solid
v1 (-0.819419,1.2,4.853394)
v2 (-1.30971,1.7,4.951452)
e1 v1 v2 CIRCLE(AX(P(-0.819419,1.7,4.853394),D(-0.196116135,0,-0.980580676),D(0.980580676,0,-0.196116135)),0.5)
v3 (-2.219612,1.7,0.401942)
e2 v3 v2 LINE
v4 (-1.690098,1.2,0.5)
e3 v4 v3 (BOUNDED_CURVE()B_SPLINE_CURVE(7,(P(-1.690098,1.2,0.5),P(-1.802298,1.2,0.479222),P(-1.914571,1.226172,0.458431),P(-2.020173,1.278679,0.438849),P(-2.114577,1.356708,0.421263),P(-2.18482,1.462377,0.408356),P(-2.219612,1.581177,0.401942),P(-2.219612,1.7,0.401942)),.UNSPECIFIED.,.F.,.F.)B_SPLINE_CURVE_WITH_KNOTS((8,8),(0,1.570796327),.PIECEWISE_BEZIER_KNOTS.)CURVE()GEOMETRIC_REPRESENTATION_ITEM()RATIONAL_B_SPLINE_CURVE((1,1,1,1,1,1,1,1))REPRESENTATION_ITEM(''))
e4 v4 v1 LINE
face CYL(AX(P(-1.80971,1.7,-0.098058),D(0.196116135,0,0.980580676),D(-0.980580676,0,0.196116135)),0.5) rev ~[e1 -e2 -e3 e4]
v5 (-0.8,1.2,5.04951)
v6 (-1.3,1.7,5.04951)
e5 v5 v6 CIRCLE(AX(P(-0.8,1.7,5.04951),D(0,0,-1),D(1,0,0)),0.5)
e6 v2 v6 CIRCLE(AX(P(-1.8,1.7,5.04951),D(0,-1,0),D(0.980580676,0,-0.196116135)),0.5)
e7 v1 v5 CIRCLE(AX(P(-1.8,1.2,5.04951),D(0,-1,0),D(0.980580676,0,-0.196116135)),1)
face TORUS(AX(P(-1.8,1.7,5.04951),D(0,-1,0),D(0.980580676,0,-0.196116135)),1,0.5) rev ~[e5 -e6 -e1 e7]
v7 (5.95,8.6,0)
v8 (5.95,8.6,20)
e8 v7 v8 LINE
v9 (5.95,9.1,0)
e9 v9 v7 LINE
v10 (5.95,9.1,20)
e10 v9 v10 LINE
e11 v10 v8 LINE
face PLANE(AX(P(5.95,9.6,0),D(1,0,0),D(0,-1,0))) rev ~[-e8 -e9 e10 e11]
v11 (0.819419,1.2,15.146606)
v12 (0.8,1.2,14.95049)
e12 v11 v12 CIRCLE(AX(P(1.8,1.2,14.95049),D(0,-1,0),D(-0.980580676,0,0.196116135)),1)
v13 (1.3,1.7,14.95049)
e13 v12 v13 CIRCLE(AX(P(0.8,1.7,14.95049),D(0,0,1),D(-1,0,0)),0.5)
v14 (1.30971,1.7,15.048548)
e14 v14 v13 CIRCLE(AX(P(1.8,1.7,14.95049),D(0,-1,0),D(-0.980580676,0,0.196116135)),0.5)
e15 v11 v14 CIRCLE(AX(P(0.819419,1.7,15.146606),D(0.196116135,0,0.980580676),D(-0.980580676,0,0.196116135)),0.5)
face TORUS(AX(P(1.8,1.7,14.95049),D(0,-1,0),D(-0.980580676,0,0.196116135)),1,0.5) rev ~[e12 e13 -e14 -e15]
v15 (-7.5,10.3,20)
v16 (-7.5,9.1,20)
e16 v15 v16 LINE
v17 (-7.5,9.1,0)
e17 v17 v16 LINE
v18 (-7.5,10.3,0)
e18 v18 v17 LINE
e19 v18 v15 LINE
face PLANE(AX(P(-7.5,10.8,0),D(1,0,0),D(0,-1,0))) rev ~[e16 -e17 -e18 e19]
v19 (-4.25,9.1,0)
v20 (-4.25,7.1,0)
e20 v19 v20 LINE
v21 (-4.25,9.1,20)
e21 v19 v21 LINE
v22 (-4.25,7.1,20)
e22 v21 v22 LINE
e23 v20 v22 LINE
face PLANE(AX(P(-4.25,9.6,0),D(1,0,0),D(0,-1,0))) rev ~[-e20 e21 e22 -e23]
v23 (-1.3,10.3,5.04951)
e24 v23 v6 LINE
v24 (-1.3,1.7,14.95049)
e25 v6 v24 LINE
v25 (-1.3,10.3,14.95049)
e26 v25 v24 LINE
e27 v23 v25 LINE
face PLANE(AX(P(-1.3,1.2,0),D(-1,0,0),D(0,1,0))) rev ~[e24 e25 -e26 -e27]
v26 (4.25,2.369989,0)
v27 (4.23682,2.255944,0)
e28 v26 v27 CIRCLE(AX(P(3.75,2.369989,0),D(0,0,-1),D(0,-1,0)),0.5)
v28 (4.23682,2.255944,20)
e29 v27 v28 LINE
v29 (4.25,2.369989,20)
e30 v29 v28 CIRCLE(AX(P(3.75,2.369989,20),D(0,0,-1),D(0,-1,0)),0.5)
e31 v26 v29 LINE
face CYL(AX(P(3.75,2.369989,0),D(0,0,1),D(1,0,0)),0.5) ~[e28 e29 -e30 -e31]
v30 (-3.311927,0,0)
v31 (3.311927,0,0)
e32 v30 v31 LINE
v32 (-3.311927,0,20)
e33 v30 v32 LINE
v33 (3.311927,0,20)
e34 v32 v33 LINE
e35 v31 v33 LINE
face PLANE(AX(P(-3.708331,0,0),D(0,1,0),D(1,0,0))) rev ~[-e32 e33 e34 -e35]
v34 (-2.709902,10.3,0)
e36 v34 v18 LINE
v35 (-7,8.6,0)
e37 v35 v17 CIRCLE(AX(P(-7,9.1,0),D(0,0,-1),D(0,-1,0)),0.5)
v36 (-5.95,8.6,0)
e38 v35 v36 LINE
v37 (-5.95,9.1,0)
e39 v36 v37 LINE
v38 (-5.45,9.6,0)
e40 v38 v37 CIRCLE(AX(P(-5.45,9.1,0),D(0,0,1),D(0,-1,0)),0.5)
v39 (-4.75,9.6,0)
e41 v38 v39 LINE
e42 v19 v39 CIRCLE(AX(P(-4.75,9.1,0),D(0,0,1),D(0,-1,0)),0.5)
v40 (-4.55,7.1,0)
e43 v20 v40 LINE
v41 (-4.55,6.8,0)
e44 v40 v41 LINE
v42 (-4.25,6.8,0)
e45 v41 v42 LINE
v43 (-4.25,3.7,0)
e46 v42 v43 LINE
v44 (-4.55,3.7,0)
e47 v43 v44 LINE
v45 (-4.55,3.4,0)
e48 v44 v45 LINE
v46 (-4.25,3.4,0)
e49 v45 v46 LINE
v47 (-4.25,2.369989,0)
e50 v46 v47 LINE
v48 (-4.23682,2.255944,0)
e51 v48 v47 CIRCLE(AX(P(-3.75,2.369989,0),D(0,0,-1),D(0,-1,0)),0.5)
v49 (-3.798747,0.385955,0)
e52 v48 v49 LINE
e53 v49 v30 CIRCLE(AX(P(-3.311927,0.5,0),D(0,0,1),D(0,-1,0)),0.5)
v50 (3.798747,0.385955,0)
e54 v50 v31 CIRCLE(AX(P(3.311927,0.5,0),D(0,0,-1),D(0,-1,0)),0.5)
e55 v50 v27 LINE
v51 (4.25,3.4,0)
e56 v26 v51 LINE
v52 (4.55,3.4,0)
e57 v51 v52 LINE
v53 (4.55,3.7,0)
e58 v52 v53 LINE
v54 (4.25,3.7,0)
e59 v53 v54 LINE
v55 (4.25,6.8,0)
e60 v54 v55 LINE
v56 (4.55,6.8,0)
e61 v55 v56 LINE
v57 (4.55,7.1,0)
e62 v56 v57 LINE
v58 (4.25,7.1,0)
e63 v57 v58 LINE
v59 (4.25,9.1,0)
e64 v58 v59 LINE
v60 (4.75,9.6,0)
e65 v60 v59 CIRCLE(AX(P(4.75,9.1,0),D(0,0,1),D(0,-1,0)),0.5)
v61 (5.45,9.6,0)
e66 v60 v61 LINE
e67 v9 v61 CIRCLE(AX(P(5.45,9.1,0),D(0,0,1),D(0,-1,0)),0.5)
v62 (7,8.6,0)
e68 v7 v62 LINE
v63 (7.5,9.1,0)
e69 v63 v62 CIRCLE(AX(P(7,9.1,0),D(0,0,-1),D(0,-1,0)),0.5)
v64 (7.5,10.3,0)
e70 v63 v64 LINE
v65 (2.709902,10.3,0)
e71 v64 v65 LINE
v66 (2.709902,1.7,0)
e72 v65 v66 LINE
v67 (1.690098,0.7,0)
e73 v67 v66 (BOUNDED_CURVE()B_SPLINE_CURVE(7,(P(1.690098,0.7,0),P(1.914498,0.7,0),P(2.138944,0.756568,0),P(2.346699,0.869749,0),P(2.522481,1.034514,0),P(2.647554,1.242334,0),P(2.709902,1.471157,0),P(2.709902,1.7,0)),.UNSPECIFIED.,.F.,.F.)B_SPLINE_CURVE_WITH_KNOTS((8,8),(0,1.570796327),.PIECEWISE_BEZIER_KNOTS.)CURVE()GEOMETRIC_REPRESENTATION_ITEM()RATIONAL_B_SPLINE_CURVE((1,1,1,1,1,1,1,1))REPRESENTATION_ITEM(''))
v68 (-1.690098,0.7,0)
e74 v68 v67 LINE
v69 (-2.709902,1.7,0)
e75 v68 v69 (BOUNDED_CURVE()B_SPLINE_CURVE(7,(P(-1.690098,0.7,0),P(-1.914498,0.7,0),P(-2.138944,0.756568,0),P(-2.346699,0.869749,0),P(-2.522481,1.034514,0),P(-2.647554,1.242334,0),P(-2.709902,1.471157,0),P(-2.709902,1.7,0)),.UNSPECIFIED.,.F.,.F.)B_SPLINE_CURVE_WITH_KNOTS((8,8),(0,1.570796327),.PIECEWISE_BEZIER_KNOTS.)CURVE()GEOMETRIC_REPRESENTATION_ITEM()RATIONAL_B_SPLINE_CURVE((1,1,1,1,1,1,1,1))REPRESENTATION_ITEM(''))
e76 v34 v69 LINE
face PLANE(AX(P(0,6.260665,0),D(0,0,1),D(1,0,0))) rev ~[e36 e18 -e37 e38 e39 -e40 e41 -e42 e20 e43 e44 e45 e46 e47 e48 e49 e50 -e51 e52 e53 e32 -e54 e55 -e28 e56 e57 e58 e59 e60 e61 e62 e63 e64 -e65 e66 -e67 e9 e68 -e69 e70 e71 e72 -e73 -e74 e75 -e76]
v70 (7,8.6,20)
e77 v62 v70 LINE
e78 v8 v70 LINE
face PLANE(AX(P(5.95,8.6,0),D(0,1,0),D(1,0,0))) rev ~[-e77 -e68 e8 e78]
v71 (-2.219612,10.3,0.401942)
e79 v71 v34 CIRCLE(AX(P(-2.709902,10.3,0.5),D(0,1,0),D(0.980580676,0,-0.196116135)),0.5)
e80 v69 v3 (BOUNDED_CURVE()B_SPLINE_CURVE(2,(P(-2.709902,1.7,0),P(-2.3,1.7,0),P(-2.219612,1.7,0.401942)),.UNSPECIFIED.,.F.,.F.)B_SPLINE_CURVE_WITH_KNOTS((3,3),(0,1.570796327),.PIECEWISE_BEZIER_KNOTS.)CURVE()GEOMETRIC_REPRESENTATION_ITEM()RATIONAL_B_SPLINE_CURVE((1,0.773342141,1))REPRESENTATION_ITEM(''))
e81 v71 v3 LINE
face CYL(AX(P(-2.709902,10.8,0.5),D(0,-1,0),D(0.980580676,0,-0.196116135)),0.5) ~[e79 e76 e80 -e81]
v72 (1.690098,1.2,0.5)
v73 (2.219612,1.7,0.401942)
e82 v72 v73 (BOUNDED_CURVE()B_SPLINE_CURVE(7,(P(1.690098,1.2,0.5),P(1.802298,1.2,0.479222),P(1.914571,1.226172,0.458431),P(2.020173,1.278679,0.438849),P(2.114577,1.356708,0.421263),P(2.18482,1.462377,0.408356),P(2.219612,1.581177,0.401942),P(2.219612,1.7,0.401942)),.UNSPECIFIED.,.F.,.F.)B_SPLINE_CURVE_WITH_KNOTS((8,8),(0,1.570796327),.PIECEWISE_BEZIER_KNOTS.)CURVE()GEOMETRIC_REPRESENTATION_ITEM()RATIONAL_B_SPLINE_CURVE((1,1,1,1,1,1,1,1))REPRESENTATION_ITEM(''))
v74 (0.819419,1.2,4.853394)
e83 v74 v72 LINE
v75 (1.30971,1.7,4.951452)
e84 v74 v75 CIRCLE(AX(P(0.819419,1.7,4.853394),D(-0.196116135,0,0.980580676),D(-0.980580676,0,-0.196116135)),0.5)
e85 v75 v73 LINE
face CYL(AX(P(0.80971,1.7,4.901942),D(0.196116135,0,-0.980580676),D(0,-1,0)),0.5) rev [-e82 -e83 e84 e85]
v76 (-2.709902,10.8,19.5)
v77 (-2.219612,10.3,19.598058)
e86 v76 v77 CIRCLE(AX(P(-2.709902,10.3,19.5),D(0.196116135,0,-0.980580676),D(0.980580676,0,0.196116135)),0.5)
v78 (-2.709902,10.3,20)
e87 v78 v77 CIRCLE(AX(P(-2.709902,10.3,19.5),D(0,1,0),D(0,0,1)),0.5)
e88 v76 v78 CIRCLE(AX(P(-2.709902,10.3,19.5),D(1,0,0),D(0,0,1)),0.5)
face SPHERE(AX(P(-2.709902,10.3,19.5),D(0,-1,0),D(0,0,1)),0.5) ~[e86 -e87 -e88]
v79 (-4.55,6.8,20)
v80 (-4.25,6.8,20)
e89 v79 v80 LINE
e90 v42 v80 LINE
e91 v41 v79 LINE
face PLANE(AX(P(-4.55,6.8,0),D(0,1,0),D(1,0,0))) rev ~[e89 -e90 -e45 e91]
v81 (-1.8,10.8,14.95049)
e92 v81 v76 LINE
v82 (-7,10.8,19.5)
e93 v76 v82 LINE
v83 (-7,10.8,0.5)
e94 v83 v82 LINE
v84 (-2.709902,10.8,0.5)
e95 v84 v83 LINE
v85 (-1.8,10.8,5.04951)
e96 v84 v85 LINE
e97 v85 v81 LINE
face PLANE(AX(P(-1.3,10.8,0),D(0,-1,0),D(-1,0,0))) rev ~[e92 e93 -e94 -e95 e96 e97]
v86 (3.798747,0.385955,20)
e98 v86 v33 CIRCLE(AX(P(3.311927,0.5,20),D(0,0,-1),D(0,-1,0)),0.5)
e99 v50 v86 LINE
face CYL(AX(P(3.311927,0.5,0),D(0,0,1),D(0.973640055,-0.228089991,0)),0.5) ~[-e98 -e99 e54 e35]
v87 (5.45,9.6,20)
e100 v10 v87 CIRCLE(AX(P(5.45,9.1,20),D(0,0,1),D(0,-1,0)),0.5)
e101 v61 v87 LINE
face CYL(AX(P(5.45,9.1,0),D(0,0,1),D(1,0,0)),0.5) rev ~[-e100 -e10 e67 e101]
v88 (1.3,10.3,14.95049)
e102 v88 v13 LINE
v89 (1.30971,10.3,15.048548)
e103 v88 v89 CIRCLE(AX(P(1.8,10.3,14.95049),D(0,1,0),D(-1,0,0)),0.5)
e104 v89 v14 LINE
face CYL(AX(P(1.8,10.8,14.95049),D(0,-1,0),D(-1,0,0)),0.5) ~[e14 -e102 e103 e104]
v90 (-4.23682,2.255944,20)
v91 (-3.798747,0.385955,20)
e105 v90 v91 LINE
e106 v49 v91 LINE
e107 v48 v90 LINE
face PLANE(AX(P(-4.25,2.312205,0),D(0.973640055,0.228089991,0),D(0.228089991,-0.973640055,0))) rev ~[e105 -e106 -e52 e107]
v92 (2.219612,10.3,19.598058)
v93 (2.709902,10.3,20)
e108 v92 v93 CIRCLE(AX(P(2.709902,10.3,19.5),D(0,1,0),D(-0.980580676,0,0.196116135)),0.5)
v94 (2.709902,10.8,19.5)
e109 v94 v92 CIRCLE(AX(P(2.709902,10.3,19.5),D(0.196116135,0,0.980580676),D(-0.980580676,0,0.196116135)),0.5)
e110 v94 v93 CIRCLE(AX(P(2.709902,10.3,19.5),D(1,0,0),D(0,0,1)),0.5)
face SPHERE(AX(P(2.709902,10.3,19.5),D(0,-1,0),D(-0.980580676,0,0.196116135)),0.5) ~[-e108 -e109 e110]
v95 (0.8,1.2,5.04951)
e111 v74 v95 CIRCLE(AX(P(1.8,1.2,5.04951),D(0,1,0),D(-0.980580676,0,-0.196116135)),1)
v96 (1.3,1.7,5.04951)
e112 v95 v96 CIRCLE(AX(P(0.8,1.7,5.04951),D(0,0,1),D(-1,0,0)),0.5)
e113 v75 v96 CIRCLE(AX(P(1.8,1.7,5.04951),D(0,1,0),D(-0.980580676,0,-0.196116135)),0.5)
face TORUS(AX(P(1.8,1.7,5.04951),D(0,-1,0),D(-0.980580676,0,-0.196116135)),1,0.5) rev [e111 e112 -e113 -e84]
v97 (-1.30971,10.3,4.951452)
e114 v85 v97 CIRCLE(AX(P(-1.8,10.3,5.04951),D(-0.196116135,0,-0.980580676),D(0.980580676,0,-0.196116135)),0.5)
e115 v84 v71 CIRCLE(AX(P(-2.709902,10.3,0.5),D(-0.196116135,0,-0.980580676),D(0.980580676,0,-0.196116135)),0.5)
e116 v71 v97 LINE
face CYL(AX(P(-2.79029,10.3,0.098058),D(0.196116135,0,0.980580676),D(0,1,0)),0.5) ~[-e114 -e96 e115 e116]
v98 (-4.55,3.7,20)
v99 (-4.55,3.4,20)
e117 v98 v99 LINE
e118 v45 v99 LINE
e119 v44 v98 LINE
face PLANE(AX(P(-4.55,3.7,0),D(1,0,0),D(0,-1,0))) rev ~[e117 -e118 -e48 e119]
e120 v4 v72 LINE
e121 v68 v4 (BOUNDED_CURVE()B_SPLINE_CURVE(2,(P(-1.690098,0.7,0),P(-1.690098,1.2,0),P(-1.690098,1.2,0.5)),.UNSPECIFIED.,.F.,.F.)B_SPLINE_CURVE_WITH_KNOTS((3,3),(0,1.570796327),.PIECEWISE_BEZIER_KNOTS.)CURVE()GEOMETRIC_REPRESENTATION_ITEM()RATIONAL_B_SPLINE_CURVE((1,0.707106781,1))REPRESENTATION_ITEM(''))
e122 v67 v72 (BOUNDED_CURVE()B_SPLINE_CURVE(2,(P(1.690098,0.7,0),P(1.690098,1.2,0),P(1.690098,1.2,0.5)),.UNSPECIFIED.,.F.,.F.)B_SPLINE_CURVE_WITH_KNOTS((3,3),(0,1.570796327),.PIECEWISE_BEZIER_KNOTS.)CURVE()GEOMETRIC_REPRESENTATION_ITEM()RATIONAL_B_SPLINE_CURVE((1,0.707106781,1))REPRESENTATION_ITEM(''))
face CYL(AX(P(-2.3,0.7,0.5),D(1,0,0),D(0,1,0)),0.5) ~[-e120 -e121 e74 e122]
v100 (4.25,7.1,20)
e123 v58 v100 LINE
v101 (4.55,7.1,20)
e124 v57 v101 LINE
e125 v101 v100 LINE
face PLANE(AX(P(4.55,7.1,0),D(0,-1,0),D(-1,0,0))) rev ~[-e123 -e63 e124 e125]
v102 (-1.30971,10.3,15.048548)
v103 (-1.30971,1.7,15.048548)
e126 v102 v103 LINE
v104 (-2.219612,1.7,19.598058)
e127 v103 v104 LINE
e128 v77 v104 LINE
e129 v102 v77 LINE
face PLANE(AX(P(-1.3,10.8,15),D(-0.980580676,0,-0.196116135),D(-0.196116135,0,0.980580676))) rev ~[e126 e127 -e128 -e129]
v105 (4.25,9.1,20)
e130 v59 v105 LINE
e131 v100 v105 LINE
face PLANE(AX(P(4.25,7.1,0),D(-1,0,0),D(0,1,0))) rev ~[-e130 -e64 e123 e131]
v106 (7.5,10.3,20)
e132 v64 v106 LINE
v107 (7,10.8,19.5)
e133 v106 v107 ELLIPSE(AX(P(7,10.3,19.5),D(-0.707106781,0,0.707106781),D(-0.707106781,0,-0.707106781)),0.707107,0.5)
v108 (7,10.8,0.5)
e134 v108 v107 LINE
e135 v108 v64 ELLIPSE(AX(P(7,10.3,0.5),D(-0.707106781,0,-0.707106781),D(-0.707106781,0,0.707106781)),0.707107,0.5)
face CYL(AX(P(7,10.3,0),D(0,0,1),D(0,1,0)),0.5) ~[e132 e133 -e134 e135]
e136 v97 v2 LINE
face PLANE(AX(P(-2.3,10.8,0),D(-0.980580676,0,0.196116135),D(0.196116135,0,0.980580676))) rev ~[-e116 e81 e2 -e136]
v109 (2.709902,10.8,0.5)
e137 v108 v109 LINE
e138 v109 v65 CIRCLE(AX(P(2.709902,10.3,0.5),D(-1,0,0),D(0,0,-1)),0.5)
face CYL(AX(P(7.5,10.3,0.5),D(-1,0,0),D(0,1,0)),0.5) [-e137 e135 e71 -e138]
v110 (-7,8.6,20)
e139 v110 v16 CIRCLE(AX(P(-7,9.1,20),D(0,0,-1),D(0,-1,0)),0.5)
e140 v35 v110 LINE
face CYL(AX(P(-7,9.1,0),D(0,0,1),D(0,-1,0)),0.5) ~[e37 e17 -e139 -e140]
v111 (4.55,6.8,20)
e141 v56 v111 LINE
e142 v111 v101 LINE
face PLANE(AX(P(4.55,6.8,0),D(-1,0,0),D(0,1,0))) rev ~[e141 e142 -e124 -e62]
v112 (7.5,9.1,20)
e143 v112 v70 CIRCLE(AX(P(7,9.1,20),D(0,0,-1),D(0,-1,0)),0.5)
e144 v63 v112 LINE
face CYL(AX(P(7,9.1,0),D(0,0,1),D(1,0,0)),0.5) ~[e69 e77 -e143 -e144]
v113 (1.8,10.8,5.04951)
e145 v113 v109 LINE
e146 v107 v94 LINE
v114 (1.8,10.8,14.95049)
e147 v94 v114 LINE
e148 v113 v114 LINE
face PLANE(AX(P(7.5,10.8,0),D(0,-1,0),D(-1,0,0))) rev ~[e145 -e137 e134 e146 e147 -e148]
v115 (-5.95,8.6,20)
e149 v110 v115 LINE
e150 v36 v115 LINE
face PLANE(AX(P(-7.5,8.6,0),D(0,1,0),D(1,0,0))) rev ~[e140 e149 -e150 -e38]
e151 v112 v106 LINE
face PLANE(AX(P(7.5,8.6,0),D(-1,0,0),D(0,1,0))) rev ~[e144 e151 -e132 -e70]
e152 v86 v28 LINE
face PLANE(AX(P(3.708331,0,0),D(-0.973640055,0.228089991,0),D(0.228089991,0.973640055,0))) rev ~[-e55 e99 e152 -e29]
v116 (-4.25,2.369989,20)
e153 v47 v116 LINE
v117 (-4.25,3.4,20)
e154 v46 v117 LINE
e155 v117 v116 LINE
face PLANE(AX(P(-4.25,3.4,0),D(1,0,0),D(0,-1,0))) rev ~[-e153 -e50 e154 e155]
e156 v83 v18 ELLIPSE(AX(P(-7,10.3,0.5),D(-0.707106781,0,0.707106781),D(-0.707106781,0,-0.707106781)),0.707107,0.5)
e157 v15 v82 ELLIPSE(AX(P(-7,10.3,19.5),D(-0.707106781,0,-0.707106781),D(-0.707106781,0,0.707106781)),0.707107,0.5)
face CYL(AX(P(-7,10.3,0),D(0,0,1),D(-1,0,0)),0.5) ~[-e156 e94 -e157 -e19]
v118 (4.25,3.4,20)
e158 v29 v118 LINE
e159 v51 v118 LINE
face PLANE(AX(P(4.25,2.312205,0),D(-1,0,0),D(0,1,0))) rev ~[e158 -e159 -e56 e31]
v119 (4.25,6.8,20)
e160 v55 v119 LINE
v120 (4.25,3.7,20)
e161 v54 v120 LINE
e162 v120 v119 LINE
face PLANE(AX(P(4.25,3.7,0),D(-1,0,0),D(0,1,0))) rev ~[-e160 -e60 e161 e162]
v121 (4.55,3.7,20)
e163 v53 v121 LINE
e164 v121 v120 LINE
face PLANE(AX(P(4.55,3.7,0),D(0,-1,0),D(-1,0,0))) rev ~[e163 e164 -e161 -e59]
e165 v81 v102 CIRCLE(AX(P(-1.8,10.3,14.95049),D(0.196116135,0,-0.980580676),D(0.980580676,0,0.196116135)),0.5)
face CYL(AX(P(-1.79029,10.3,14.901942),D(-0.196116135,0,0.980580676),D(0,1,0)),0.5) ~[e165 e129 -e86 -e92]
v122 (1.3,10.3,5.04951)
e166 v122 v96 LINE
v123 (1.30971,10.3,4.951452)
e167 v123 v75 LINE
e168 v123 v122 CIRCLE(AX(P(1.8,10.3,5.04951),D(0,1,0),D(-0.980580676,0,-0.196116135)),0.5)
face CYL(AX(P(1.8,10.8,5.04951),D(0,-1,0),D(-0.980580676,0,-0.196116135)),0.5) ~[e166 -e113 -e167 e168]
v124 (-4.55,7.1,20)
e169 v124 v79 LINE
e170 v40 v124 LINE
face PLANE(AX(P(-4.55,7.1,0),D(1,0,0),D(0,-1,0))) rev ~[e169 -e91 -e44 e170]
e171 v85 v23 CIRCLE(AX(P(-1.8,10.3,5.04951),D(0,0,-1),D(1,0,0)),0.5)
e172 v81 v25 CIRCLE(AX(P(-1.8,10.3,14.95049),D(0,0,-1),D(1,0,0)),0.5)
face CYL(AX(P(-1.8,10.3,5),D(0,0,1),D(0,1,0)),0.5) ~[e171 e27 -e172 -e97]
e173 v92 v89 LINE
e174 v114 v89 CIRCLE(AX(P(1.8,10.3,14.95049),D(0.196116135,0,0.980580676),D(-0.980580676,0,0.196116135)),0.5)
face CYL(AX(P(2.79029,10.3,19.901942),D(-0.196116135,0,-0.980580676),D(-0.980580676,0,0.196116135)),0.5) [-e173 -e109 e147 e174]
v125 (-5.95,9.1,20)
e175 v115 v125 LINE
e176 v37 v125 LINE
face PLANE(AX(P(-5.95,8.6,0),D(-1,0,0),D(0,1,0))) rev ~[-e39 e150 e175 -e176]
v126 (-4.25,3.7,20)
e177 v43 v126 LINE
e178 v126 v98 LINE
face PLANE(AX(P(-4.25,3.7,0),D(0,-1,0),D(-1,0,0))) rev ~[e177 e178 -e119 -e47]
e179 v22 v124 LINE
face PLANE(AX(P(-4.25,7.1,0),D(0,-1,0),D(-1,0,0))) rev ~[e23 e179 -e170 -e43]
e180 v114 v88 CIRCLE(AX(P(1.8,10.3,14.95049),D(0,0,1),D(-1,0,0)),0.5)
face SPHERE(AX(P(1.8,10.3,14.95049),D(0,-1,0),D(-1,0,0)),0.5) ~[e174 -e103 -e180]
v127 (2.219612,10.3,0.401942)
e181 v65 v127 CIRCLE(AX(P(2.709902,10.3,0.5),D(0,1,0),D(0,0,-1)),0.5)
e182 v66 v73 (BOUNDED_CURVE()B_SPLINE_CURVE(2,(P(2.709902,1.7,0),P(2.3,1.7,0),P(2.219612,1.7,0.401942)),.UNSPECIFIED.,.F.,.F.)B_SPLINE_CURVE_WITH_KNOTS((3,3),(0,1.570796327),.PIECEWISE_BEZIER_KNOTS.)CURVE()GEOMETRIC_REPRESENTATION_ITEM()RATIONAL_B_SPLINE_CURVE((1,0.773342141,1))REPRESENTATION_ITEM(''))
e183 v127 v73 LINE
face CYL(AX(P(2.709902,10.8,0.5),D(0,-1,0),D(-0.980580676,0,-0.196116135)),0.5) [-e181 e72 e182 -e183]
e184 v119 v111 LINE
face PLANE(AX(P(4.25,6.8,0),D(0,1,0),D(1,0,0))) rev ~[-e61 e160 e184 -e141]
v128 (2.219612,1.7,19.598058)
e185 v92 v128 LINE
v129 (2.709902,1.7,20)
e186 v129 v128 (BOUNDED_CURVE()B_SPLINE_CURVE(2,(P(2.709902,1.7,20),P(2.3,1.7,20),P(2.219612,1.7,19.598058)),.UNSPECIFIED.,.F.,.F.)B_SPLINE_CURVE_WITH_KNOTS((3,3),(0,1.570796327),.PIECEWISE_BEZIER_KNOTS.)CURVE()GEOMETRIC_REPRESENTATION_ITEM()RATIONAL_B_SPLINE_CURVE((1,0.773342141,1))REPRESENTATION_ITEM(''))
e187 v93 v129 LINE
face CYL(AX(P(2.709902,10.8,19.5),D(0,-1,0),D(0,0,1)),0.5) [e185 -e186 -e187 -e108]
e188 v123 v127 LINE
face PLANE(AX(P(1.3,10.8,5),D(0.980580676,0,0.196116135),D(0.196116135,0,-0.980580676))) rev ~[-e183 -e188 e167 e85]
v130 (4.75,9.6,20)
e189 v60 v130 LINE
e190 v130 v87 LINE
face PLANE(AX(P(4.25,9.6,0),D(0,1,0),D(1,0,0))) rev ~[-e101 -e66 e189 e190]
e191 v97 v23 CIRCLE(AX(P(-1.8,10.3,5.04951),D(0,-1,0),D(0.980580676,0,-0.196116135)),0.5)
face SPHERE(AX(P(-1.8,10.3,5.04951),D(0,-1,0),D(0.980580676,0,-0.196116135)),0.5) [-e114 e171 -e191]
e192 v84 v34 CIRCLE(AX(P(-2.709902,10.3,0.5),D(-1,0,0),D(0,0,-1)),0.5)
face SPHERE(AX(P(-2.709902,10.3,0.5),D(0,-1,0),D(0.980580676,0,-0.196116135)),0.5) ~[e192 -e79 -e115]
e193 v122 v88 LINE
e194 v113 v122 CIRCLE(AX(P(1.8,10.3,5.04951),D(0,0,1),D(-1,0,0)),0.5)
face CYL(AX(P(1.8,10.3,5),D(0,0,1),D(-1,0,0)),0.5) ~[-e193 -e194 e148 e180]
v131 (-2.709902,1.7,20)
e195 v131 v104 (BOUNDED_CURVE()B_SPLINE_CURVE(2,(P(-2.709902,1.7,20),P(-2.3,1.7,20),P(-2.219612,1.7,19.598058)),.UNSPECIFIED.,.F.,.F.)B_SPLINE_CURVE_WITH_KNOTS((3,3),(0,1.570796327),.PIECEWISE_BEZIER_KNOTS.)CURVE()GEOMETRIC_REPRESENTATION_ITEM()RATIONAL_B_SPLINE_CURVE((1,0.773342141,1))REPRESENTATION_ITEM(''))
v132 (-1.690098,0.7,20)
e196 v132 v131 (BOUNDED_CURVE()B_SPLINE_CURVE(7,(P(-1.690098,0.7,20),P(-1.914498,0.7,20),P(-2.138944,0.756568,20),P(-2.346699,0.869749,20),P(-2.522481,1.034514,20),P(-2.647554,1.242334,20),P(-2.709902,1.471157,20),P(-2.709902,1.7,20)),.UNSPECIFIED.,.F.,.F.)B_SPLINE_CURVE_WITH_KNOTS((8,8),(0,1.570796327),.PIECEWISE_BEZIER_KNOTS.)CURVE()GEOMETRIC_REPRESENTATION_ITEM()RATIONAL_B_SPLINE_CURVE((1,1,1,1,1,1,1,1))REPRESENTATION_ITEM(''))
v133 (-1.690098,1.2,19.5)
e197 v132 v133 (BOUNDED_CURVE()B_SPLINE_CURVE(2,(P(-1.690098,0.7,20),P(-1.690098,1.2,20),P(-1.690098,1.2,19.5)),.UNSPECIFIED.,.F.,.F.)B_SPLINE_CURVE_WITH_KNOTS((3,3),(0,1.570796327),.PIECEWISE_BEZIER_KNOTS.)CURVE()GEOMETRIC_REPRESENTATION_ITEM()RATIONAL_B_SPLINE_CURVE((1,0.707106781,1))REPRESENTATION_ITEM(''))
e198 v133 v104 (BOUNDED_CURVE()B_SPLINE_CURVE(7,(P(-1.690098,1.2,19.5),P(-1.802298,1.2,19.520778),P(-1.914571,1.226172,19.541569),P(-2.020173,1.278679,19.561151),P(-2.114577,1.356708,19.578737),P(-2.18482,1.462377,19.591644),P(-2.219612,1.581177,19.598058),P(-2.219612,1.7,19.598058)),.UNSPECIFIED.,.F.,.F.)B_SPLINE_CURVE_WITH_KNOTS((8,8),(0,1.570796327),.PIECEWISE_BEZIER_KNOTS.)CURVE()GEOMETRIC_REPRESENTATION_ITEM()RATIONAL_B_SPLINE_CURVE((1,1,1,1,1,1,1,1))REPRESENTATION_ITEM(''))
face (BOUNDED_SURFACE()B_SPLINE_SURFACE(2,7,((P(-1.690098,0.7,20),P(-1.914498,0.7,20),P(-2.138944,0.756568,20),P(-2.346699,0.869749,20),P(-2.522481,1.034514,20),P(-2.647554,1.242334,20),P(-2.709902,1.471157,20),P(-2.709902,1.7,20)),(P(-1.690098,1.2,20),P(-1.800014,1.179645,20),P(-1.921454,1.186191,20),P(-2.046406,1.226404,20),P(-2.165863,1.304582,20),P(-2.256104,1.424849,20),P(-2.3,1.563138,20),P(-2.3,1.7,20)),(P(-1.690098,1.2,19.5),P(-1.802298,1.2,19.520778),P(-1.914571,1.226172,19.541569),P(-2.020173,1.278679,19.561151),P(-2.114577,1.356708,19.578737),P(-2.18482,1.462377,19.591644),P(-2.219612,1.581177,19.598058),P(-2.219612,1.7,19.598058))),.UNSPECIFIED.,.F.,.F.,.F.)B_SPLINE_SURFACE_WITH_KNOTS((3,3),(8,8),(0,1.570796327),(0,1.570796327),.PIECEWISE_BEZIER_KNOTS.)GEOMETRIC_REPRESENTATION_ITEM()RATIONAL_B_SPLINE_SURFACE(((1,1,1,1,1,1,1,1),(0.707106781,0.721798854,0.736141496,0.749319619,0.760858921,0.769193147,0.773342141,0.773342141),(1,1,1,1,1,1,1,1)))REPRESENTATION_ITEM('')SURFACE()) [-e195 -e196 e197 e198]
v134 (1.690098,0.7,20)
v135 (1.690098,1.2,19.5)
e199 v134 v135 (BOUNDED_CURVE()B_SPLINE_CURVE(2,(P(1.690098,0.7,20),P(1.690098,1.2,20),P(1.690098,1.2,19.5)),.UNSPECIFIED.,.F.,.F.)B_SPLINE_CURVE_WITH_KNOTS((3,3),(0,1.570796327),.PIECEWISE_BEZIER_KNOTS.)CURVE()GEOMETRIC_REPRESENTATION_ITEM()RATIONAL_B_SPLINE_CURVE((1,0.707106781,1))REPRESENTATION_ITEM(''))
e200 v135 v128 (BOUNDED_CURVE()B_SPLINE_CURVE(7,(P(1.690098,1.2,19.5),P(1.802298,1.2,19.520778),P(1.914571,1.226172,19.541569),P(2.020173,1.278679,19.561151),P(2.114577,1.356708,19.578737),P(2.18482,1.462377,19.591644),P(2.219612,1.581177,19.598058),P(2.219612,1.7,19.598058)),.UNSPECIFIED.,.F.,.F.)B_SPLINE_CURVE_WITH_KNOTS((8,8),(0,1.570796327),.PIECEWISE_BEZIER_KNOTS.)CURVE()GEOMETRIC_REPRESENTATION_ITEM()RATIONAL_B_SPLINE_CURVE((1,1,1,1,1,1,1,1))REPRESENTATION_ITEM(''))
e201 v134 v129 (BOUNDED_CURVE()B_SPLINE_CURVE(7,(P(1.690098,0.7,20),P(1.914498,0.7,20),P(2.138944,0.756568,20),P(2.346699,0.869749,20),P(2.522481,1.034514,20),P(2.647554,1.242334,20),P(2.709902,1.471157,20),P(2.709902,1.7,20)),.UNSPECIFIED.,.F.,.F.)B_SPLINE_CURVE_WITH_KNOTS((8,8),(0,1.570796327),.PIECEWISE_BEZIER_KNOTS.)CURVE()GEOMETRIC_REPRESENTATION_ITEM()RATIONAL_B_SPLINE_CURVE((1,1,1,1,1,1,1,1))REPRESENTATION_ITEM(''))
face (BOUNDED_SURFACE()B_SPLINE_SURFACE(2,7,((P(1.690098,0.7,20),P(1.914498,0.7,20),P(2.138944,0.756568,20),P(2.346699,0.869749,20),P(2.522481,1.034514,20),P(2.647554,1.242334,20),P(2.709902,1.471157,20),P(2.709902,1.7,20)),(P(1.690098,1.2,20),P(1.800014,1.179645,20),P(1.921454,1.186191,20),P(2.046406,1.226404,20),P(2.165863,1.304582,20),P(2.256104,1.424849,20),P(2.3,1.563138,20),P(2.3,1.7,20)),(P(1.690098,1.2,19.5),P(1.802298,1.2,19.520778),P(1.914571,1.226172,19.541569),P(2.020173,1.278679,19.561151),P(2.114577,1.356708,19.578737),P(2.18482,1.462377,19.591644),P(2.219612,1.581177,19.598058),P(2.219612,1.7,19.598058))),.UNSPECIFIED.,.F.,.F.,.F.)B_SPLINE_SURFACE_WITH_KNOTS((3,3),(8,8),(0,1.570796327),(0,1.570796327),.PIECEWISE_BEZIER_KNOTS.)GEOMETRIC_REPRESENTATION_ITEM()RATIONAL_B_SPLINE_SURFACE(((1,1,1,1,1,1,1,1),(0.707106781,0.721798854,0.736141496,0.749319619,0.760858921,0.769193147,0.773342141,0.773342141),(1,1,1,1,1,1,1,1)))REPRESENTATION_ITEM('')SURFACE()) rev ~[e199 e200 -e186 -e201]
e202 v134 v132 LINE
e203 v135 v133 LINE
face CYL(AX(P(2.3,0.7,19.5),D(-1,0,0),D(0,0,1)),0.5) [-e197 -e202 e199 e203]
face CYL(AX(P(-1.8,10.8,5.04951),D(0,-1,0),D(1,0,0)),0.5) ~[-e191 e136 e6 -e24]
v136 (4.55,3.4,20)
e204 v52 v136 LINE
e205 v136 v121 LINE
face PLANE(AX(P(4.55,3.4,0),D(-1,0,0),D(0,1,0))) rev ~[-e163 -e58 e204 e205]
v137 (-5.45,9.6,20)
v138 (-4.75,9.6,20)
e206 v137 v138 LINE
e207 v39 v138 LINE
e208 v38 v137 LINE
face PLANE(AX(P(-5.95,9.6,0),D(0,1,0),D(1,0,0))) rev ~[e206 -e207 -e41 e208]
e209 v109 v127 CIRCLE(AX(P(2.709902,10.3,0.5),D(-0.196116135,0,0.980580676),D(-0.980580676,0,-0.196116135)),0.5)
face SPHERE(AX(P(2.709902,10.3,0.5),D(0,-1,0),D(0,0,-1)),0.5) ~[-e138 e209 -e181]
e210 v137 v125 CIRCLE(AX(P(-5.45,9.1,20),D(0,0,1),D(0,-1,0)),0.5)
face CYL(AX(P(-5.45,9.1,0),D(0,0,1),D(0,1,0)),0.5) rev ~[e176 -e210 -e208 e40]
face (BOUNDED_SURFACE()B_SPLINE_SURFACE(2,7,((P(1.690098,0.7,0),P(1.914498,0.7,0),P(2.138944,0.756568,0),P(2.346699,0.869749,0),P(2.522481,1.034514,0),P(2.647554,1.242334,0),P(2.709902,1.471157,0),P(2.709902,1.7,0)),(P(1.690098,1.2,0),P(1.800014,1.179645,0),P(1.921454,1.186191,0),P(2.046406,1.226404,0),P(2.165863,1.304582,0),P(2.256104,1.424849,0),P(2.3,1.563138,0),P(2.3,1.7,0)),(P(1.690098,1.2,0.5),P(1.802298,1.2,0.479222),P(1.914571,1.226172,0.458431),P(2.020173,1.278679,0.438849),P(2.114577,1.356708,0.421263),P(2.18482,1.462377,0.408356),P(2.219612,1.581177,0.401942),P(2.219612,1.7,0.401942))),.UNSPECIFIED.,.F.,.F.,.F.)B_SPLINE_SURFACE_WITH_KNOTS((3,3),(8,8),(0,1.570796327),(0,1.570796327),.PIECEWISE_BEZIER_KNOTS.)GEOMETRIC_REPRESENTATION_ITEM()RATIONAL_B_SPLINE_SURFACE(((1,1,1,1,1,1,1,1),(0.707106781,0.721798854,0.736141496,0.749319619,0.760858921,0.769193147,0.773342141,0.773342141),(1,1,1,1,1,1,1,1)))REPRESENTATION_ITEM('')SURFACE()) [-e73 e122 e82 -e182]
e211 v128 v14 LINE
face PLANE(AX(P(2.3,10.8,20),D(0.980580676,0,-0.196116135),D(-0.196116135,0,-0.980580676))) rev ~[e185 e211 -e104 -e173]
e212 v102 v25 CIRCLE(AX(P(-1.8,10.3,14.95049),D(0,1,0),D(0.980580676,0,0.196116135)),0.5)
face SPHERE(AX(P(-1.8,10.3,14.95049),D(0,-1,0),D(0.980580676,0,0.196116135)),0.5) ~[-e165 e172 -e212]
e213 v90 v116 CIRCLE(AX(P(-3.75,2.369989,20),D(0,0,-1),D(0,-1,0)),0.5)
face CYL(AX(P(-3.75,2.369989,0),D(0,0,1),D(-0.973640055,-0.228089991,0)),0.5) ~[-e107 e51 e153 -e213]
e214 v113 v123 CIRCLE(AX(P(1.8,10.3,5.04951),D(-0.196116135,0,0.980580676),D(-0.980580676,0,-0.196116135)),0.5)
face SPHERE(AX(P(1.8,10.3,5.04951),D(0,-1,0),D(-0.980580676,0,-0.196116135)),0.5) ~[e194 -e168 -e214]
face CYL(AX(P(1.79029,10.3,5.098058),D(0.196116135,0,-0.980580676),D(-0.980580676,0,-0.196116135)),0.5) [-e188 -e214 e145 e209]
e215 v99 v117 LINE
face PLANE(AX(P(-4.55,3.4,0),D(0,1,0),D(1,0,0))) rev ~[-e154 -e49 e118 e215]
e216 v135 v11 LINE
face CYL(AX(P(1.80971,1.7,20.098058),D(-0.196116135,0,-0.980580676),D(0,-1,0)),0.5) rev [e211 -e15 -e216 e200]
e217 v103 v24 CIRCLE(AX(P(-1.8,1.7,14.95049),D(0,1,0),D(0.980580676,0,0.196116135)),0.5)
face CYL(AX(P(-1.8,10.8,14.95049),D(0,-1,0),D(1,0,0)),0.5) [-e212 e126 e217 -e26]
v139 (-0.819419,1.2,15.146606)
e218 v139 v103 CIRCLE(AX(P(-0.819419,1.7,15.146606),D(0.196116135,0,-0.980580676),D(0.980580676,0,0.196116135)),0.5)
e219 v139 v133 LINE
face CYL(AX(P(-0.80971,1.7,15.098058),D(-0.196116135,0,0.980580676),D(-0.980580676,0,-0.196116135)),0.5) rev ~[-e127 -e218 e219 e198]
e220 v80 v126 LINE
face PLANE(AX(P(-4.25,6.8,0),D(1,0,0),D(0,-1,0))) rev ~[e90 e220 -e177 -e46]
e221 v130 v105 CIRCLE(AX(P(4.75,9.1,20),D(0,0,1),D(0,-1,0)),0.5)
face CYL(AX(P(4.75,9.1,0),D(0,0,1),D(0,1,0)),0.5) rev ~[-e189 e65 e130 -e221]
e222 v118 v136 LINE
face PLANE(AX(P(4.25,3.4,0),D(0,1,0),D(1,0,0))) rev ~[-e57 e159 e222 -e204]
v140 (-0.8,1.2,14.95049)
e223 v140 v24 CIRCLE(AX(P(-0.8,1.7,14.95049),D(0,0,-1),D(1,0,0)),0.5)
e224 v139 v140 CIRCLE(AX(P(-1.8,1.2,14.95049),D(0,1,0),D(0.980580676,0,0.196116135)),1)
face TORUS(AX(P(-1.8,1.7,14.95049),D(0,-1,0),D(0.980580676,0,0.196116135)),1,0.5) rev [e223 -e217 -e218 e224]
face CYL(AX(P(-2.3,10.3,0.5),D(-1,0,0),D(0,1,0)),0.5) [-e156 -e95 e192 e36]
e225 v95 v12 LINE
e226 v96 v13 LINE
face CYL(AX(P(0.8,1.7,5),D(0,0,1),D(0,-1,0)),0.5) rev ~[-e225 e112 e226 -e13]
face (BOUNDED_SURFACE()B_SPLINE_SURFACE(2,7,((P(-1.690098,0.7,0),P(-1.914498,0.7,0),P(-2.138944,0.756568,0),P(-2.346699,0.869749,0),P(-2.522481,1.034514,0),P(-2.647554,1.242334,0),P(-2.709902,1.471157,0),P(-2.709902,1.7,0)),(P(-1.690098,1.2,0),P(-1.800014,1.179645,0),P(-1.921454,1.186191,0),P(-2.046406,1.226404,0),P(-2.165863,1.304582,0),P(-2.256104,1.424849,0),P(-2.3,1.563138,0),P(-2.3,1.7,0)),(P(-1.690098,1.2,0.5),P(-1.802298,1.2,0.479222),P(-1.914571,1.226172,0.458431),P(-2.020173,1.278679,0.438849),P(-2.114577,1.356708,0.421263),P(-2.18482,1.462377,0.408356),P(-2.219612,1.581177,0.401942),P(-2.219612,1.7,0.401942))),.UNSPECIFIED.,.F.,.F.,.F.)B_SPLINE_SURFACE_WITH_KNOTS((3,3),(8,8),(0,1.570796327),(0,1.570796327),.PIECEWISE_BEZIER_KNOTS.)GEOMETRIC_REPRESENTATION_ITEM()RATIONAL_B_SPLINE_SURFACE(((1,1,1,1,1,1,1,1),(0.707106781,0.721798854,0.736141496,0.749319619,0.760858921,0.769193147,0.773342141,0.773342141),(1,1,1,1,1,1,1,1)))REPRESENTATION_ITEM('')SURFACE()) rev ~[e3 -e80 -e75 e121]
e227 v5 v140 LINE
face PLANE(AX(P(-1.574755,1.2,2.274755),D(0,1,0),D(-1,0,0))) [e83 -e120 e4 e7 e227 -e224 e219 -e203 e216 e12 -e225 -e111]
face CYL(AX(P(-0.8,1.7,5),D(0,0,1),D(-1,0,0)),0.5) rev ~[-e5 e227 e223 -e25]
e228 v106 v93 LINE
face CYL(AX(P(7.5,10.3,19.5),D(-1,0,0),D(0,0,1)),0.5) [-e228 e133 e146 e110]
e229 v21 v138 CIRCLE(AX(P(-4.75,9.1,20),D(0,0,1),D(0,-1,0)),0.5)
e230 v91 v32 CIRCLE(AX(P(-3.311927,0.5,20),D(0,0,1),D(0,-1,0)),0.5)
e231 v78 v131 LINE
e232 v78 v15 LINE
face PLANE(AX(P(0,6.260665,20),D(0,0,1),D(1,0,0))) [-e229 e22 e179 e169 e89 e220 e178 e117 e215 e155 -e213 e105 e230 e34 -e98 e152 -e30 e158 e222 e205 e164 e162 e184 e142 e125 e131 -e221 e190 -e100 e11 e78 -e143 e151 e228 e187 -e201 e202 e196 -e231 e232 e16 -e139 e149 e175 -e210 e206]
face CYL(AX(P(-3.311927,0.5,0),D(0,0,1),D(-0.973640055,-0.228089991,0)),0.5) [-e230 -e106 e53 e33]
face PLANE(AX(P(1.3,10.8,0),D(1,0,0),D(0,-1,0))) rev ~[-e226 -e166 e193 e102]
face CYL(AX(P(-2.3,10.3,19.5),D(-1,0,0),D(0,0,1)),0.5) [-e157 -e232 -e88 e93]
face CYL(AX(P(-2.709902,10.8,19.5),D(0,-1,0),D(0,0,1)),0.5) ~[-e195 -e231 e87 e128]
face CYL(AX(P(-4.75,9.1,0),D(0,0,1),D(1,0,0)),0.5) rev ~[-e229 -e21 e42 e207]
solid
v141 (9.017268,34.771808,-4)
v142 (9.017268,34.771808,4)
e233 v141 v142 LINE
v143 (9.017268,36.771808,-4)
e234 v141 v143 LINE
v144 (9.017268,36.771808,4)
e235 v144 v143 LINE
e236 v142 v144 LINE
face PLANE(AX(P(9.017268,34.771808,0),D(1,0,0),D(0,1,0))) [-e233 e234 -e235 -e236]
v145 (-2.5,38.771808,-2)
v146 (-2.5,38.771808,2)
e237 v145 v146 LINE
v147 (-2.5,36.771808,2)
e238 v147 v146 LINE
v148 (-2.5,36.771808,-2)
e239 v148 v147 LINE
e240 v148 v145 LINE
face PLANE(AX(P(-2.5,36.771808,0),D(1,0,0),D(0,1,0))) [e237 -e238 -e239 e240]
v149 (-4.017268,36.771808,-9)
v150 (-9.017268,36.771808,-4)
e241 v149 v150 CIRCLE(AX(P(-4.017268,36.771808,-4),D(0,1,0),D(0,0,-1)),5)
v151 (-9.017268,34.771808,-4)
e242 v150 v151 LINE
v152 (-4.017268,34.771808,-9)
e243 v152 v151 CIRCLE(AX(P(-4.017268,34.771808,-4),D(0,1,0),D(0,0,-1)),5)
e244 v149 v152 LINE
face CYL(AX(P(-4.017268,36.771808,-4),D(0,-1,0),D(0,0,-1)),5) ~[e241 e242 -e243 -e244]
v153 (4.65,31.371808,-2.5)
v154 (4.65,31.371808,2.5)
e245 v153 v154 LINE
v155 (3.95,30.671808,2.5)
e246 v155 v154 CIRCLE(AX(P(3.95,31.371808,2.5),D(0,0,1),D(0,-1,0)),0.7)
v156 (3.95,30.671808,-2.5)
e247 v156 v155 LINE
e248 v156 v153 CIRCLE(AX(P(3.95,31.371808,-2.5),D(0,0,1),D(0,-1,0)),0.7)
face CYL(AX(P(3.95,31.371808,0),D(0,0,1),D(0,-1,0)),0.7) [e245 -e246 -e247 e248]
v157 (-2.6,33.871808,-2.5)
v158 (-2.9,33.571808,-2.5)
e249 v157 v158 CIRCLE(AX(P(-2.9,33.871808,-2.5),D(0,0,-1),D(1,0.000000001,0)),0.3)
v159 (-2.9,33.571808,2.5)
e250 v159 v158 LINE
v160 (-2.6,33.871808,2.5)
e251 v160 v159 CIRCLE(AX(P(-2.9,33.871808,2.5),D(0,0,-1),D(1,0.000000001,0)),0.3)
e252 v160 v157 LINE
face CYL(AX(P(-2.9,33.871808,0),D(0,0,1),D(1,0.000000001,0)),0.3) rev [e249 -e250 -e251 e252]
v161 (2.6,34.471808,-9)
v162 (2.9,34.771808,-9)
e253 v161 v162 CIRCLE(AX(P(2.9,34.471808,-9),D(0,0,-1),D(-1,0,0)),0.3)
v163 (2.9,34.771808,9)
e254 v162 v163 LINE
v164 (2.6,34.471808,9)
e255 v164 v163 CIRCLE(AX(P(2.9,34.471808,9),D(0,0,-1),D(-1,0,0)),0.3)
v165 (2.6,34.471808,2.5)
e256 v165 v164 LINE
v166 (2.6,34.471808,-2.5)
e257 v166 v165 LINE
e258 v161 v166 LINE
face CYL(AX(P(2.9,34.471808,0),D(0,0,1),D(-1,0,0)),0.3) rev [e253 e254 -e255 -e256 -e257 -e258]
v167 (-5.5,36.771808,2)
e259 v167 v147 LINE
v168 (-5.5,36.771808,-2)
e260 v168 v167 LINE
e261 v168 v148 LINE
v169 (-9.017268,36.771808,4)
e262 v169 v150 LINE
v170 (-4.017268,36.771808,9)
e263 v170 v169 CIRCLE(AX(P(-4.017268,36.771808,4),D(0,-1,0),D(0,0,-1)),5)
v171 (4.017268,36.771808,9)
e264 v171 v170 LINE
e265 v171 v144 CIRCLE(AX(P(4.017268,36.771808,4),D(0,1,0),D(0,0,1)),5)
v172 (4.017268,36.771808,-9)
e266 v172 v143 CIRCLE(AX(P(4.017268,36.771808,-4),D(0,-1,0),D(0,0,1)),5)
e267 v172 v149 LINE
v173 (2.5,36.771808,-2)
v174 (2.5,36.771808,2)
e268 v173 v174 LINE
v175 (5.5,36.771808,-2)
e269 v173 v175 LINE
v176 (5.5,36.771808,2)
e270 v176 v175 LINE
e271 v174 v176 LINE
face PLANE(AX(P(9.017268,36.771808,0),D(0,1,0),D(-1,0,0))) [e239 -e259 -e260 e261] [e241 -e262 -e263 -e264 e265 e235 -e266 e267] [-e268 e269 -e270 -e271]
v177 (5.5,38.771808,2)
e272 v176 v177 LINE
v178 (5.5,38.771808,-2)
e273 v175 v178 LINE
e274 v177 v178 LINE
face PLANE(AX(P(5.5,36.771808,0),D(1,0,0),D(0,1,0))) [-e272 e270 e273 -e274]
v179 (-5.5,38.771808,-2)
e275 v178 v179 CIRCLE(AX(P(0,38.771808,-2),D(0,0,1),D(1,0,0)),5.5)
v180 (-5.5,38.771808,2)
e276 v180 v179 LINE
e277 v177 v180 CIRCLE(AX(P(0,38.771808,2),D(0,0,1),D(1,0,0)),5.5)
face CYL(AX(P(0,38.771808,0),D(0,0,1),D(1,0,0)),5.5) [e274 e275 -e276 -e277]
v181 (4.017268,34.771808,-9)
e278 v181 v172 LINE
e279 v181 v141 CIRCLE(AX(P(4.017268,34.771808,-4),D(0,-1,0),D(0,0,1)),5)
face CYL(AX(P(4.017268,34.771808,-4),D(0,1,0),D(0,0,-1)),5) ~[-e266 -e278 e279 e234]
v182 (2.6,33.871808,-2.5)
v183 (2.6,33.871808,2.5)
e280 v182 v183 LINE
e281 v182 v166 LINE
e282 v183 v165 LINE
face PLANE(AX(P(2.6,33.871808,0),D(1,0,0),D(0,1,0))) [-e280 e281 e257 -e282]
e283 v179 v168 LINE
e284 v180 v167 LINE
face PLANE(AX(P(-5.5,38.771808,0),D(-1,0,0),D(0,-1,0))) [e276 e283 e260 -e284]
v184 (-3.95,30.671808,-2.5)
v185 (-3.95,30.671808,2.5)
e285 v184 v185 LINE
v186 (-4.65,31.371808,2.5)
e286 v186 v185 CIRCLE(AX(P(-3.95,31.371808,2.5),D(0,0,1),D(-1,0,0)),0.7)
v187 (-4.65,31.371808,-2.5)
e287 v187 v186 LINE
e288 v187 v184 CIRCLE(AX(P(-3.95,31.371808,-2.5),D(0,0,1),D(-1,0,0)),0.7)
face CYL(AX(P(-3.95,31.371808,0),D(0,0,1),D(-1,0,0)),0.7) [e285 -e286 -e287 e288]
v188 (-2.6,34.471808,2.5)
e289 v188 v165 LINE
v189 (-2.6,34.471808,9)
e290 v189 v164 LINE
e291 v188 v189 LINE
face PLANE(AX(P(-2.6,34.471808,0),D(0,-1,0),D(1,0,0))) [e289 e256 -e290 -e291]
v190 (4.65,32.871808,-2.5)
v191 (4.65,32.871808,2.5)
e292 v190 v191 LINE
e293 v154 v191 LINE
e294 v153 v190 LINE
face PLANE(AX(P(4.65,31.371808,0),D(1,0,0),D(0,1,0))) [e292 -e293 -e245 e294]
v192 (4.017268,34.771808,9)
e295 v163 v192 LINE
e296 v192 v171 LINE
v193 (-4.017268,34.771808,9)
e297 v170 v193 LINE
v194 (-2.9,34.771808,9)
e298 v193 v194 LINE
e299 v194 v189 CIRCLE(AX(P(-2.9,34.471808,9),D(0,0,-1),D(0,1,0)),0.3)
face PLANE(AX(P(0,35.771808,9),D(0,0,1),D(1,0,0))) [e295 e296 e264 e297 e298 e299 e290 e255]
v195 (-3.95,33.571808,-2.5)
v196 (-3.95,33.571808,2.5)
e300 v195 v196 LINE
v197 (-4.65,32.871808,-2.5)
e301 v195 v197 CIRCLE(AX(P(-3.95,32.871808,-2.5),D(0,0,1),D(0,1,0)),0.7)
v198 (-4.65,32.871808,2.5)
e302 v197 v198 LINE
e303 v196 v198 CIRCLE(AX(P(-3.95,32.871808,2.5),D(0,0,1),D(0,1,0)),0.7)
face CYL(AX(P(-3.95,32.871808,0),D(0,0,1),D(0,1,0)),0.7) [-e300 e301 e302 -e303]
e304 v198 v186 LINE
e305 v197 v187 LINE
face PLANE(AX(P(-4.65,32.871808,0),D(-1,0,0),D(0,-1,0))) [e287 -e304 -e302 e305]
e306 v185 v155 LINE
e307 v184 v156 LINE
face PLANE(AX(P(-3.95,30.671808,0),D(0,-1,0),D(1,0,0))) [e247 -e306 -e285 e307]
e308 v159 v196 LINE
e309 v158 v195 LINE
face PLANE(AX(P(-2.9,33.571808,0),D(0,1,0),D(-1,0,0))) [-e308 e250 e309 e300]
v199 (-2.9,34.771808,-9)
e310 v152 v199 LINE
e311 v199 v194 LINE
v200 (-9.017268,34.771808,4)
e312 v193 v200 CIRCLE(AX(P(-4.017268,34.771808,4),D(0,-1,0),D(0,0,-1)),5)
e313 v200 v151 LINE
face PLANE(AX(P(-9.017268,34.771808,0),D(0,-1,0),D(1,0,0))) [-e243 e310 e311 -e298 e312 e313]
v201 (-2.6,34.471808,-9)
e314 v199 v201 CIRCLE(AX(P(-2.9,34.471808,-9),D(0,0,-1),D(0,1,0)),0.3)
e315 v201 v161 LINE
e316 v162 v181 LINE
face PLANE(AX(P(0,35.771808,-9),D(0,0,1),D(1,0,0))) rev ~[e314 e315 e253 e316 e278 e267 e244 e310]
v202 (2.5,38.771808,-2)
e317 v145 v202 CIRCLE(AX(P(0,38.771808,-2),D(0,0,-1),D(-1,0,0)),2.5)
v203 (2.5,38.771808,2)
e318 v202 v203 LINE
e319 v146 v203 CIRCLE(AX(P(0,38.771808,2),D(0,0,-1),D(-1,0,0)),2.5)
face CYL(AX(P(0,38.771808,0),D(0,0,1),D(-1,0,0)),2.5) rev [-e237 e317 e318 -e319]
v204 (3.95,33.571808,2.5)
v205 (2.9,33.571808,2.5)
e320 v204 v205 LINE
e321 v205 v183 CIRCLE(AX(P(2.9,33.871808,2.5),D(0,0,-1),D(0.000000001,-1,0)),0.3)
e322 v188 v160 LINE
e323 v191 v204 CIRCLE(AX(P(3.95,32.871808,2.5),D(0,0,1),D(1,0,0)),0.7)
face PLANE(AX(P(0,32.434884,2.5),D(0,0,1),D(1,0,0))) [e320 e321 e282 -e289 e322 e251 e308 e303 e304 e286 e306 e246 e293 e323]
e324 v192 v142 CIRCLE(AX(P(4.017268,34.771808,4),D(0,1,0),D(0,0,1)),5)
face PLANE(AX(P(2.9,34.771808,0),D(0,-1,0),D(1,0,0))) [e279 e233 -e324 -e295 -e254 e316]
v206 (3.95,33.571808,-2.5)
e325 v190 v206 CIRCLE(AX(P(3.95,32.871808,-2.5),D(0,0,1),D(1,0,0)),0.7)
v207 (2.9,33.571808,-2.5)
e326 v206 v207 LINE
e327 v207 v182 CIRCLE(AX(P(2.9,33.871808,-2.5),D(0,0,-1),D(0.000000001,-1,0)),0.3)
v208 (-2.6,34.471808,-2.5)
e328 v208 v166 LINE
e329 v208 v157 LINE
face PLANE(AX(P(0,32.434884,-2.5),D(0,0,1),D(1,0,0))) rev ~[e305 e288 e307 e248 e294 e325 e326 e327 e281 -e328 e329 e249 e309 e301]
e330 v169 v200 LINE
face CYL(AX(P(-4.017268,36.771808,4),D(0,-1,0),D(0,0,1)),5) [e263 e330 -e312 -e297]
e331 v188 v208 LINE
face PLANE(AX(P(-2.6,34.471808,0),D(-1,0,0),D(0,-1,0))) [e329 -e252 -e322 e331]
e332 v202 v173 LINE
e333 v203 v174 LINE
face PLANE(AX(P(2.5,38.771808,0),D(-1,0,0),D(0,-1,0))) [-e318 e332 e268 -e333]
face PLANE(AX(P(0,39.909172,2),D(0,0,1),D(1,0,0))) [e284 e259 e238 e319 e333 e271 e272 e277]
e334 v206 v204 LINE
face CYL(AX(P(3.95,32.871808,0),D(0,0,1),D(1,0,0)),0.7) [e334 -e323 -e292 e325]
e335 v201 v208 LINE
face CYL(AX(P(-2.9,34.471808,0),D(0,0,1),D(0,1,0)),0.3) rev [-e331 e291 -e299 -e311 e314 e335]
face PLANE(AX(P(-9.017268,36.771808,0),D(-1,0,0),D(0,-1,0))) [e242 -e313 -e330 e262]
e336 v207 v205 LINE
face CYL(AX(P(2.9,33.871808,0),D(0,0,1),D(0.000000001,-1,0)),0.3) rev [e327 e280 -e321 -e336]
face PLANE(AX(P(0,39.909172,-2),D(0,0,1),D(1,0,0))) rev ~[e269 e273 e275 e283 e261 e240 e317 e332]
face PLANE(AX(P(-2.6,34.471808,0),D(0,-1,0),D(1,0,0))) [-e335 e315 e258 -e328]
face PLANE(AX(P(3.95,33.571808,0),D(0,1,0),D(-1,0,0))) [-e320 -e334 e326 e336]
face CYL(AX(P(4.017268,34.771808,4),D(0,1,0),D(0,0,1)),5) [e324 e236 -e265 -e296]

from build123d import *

# Parameters (mm, degrees)
F1_DEPTH = 20
F3_DEPTH = 9.6
F4_R     = 0.5
F6_DEPTH = 2.5
F7_DEPTH = 9
F8_DEPTH = 2
F9_R     = 5


# Not quite as in the source:
# - a feature names something its author has since deleted; it is built from what else it names


with BuildPart() as f1:
    # F0 (on Top) → F1 (new body)
    with BuildSketch(Plane.XY):
        Polygon((-4.25, 2.3122045677), (-3.7083309144, 0), (3.7083309144, 0), (4.25, 2.3122045677), (4.25, 3.4), (4.55, 3.4), (4.55, 3.7), (4.25, 3.7), (4.25, 6.8), (4.55, 6.8), (4.55, 7.1), (4.25, 7.1), (4.25, 9.6), (5.95, 9.6), (5.95, 8.6), (7.5, 8.6), (7.5, 10.8), (1.3, 10.8), (1.3, 1.2), (-1.3, 1.2), (-1.3, 10.8), (-7.5, 10.8), (-7.5, 8.6), (-5.95, 8.6), (-5.95, 9.6), (-4.25, 9.6), (-4.25, 7.1), (-4.55, 7.1), (-4.55, 6.8), (-4.25, 6.8), (-4.25, 3.7), (-4.55, 3.7), (-4.55, 3.4), (-4.25, 3.4), align=None)
    extrude(amount=F1_DEPTH)

    # F2 (on face) → F3 (cut)
    with BuildSketch(Plane(origin=(0, 10.8, 0), x_dir=(-1, 0, 0), z_dir=(0, 1, 0))):
        Polygon((2.3, 0), (1.3, 5), (1.3, 0), align=None)
        Polygon((-2.3, 0), (-1.3, 0), (-1.3, 5), align=None)
        Polygon((-2.3, 20), (-1.3, 15), (-1.3, 20), align=None)
        Polygon((2.3, 20), (1.3, 20), (1.3, 15), align=None)
    extrude(amount=-F3_DEPTH, mode=Mode.SUBTRACT)

    # F4
    f4_edges = [f1.edges().sort_by_distance(p)[0] for p in [
        (4.9, 10.8, 0),
        (1.8, 10.8, 2.5),
        (1.3, 10.8, 10),
        (1.8, 10.8, 17.5),
        (4.9, 10.8, 20),
        (7.5, 10.8, 10),
        (-1.8, 10.8, 2.5),
        (-4.9, 10.8, 0),
        (-7.5, 10.8, 10),
        (-4.9, 10.8, 20),
        (-1.8, 10.8, 17.5),
        (-1.3, 10.8, 10),
        (-2.3, 6, 0),
        (-1.3, 6, 5),
        (-1.8, 1.2, 2.5),
        (1.3, 6, 5),
        (2.3, 6, 0),
        (1.8, 1.2, 2.5),
        (2.3, 6, 20),
        (1.3, 6, 15),
        (1.8, 1.2, 17.5),
        (-1.3, 6, 15),
        (-2.3, 6, 20),
        (-1.8, 1.2, 17.5),
        (-4.25, 9.6, 10),
        (-5.95, 9.6, 10),
        (4.25, 9.6, 10),
        (5.95, 9.6, 10),
        (-7.5, 8.6, 10),
        (7.5, 8.6, 10),
        (3.708331, 0, 10),
        (4.25, 2.312205, 10),
        (-4.25, 2.312205, 10),
        (-3.708331, 0, 10),
        (0, 1.2, 20),
        (-1.3, 1.2, 10),
        (1.3, 1.2, 10),
        (0, 1.2, 0),
    ]]
    fillet(f4_edges, radius=F4_R)


with BuildPart() as f6:
    # F5 (on Top) → F6 (new body, symmetric)
    with BuildSketch(Plane.XY):
        with BuildLine():
            Line((-2.9, 33.5718078229), (-3.95, 33.5718078229))
            ThreePointArc((-3.95, 33.5718078229), (-4.4449747468, 33.3667825697), (-4.65, 32.8718078229))
            Line((-4.65, 32.8718078229), (-4.65, 31.3718078229))
            ThreePointArc((-4.65, 31.3718078229), (-4.4449747468, 30.876833076), (-3.95, 30.6718078229))
            Line((-3.95, 30.6718078229), (3.95, 30.6718078229))
            ThreePointArc((3.95, 30.6718078229), (4.4449747468, 30.876833076), (4.65, 31.3718078229))
            Line((4.65, 31.3718078229), (4.65, 32.8718078229))
            ThreePointArc((4.65, 32.8718078229), (4.4449747468, 33.3667825697), (3.95, 33.5718078229))
            Line((3.95, 33.5718078229), (2.9, 33.5718078229))
            ThreePointArc((2.9, 33.5718078229), (2.6878679656, 33.6596757885), (2.6, 33.8718078229))
            Line((2.6, 33.8718078229), (2.6, 34.4718078229))
            Line((2.6, 34.4718078229), (-2.6, 34.4718078229))
            Line((-2.6, 34.4718078229), (-2.6, 33.8718078229))
            ThreePointArc((-2.6, 33.8718078229), (-2.6878679656, 33.6596757885), (-2.9, 33.5718078229))
        make_face()
        with BuildLine():
            ThreePointArc((-2.9, 34.7718078229), (-2.6878679656, 34.6839398572), (-2.6, 34.4718078229))
            Line((-2.6, 34.4718078229), (2.6, 34.4718078229))
            ThreePointArc((2.6, 34.4718078229), (2.6878679656, 34.6839398572), (2.9, 34.7718078229))
            Line((2.9, 34.7718078229), (2.75, 34.7718078229))
            Line((2.75, 34.7718078229), (-2.75, 34.7718078229))
            Line((-2.75, 34.7718078229), (-2.9, 34.7718078229))
        make_face()
    extrude(amount=F6_DEPTH, both=True)

    # F5 (on Top) → F7 (join, symmetric)
    with BuildSketch(Plane.XY):
        Polygon((-9.0172681957, 34.7718078229), (-2.9, 34.7718078229), (-2.75, 34.7718078229), (2.75, 34.7718078229), (2.9, 34.7718078229), (9.0172681957, 34.7718078229), (9.0172681957, 36.7718078229), (5.5, 36.7718078229), (2.5, 36.7718078229), (-2.5, 36.7718078229), (-5.5, 36.7718078229), (-9.0172681957, 36.7718078229), align=None)
        with BuildLine():
            ThreePointArc((-2.9, 34.7718078229), (-2.6878679656, 34.6839398572), (-2.6, 34.4718078229))
            Line((-2.6, 34.4718078229), (2.6, 34.4718078229))
            ThreePointArc((2.6, 34.4718078229), (2.6878679656, 34.6839398572), (2.9, 34.7718078229))
            Line((2.9, 34.7718078229), (2.75, 34.7718078229))
            Line((2.75, 34.7718078229), (-2.75, 34.7718078229))
            Line((-2.75, 34.7718078229), (-2.9, 34.7718078229))
        make_face()
    extrude(amount=F7_DEPTH, both=True)

    # F5 (on Top) → F8 (join, symmetric)
    with BuildSketch(Plane.XY):
        with BuildLine():
            Line((-5.5, 38.7718078229), (-5.5, 36.7718078229))
            Line((-5.5, 36.7718078229), (-2.5, 36.7718078229))
            Line((-2.5, 36.7718078229), (-2.5, 38.7718078229))
            ThreePointArc((-2.5, 38.7718078229), (0, 41.2718078229), (2.5, 38.7718078229))
            Line((2.5, 38.7718078229), (2.5, 36.7718078229))
            Line((2.5, 36.7718078229), (5.5, 36.7718078229))
            Line((5.5, 36.7718078229), (5.5, 38.7718078229))
            ThreePointArc((5.5, 38.7718078229), (0, 44.2718078229), (-5.5, 38.7718078229))
        make_face()
    extrude(amount=F8_DEPTH, both=True)

    # F9
    f9_edges = [f6.edges().sort_by_distance(p)[0] for p in [
        (-9.017268, 35.771808, 9),
        (-9.017268, 35.771808, -9),
        (9.017268, 35.771808, 9),
        (9.017268, 35.771808, -9),
    ]]
    fillet(f9_edges, radius=F9_R)


solid = Compound([f1.part, f6.part])
